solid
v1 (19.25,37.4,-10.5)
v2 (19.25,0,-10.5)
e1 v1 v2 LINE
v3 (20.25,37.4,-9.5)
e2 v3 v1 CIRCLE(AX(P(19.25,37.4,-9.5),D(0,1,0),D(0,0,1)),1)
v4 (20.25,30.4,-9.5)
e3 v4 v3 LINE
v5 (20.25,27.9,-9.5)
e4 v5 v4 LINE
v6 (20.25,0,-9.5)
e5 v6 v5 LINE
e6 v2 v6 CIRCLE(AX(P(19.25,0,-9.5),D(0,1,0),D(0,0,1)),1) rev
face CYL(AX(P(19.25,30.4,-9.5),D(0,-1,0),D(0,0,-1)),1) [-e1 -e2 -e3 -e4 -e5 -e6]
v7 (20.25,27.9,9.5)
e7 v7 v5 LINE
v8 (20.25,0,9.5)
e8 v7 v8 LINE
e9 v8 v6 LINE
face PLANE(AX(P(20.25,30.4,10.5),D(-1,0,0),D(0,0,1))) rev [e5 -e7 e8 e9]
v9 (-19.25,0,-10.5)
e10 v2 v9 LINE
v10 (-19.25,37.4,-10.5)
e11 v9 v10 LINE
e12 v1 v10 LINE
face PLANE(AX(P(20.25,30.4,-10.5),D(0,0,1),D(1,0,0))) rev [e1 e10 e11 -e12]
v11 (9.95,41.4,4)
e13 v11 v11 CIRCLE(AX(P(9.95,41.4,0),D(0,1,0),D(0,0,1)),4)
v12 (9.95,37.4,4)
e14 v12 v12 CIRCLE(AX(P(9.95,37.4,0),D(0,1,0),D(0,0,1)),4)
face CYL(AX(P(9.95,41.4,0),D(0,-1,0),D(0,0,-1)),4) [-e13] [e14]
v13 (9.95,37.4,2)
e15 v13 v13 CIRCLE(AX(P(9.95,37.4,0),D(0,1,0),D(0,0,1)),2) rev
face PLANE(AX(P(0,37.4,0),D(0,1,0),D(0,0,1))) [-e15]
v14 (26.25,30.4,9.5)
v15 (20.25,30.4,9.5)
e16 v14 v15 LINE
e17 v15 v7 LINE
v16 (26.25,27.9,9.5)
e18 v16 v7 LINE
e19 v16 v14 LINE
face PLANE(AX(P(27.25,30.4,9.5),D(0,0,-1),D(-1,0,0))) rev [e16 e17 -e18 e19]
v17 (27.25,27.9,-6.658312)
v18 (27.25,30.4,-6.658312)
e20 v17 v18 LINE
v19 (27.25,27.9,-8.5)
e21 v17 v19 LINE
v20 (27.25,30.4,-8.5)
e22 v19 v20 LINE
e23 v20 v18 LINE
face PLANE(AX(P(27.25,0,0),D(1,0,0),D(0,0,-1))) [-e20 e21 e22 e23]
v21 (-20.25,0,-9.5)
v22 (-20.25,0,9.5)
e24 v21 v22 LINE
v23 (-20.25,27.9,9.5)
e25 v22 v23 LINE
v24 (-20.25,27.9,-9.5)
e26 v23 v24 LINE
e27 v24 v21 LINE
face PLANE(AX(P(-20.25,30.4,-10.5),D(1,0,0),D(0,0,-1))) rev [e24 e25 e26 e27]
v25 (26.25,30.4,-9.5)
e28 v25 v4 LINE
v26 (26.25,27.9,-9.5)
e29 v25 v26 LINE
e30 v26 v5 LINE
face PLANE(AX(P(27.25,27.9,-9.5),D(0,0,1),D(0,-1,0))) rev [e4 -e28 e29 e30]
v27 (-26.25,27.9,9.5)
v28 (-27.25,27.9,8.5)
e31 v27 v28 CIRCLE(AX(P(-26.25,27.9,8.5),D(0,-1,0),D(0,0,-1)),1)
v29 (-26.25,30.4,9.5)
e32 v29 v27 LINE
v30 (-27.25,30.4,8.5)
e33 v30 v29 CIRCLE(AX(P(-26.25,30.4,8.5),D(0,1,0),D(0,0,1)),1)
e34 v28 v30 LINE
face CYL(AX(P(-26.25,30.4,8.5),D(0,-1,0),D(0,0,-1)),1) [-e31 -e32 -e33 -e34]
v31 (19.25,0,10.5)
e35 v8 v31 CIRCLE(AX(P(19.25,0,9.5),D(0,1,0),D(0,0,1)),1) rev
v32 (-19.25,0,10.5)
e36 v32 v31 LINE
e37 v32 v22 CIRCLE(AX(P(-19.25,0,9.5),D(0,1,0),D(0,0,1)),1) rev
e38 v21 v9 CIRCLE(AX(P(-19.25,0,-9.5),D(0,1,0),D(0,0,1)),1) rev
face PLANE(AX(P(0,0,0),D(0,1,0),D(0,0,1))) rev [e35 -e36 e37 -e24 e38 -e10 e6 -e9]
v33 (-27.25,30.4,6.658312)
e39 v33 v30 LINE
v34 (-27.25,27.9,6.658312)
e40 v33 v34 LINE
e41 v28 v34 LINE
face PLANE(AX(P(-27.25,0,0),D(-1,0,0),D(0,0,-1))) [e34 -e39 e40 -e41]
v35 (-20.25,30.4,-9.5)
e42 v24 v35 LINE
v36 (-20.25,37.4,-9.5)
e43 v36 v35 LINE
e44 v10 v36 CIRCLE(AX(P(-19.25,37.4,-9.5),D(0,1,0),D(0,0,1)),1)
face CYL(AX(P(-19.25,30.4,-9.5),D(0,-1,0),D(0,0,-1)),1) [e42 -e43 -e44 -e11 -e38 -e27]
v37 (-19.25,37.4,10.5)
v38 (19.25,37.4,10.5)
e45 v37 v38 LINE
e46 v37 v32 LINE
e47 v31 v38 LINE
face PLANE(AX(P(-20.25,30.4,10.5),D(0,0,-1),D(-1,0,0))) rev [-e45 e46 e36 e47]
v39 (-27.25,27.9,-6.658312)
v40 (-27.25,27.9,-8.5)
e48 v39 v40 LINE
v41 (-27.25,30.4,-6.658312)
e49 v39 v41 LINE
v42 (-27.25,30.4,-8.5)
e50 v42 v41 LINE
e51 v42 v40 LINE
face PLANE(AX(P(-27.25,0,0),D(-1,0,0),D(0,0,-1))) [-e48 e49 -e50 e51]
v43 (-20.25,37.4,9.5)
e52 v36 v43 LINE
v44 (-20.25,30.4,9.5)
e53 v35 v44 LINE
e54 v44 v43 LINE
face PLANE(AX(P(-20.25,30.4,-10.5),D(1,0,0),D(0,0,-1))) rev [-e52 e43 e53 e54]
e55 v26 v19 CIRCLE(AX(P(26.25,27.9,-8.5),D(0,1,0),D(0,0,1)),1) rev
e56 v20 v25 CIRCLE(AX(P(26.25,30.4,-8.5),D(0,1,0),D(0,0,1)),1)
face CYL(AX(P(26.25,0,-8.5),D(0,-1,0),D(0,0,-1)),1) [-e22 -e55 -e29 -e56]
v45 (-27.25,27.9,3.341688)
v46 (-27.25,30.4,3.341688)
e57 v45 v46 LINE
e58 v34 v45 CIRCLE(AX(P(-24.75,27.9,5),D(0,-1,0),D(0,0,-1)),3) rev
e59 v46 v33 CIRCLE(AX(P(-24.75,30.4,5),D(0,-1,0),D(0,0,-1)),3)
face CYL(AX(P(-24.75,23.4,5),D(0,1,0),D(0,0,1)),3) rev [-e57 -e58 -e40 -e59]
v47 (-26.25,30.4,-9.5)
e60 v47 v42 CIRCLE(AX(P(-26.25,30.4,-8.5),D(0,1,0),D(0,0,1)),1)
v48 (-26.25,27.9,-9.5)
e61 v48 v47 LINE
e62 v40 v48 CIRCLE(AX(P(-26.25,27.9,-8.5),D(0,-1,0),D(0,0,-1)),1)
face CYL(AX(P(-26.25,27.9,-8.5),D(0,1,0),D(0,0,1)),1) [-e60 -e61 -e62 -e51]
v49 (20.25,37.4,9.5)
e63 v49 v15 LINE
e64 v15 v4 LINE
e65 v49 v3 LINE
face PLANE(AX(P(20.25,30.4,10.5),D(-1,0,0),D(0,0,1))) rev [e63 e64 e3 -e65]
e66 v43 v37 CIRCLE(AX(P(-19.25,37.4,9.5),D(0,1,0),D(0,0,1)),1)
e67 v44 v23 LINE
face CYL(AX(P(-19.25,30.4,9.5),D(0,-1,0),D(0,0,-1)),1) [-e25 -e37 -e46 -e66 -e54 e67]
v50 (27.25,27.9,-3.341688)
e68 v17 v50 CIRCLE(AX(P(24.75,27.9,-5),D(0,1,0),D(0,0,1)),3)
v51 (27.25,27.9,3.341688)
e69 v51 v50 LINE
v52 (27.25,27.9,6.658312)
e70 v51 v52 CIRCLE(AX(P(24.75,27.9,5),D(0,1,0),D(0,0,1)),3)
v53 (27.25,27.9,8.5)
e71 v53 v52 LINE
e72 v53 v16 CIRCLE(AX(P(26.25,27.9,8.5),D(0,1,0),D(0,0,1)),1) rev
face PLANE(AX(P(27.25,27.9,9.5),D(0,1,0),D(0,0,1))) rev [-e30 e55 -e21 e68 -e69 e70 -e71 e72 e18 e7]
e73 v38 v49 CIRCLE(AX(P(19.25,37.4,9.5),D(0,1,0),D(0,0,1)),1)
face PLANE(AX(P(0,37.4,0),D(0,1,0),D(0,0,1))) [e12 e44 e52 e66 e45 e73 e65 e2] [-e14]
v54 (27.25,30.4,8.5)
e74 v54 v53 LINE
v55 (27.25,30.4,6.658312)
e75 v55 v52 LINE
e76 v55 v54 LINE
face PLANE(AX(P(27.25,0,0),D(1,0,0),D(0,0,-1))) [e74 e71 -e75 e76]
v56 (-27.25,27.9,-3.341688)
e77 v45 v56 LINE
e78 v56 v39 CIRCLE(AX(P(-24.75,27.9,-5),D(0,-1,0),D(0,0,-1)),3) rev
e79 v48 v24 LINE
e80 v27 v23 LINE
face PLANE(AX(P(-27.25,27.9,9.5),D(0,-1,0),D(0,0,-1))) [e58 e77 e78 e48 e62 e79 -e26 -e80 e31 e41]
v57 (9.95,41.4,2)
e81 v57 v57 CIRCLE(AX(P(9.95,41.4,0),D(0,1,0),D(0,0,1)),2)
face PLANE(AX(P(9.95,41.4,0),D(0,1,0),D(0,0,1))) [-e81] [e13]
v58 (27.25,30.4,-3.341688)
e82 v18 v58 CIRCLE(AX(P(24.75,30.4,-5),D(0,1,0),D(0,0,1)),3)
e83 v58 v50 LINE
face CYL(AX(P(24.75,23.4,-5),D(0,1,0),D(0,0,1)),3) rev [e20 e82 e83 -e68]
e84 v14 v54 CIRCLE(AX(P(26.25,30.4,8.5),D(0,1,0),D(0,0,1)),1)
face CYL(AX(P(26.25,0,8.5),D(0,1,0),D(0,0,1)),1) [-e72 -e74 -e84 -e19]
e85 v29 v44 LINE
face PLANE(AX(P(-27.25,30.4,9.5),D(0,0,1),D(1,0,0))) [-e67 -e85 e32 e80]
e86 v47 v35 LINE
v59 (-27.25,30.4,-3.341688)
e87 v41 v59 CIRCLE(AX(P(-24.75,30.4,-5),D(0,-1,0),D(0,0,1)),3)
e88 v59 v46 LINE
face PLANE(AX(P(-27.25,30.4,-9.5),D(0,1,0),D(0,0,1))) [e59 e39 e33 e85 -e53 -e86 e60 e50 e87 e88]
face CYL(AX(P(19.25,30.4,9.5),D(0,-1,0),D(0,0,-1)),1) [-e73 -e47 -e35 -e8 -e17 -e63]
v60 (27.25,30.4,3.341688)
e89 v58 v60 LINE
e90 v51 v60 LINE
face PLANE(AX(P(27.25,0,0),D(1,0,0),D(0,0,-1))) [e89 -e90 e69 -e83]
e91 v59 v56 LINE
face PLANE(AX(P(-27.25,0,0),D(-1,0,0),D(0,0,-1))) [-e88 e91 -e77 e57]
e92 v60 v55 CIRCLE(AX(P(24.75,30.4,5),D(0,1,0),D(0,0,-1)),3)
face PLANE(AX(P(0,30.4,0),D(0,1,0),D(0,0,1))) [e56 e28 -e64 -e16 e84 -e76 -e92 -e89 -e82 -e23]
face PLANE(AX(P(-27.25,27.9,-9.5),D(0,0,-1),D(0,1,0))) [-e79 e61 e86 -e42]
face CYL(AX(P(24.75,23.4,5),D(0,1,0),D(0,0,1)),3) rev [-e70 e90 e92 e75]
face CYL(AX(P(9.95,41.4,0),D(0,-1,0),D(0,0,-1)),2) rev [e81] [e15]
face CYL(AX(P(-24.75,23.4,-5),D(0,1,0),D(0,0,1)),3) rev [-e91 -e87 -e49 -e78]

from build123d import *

# Parameters (mm, degrees)
SKETCH_1_W          = 40.5
SKETCH_1_H          = 21
EXTRUDE_1_DEPTH     = 30.4
SKETCH_2_W          = 19
SKETCH_2_H          = 2.5
EXTRUDE_2_DEPTH     = 7
SKETCH_3_W          = 40.5
SKETCH_3_H          = 21
EXTRUDE_3_DEPTH     = 7
SKETCH_4_R          = 3
CUT_EXTRUDE_1_DEPTH = 7
SKETCH_5_R          = 4
SKETCH_5_R_2        = 2
EXTRUDE_4_DEPTH     = 4
FILLET_1_R          = 1
FILLET_2_R          = 1
FILLET_3_R          = 1
FILLET_4_R          = 1
FILLET_5_R          = 1
FILLET_6_R          = 1
FILLET_7_R          = 1
FILLET_8_R          = 1


with BuildPart() as part:
    # 草图1 → 凸台-拉伸1 (new body)
    with BuildSketch(Plane(origin=(0, 0, 0), x_dir=(1, 0, 0), z_dir=(0, 1, 0))):
        Rectangle(SKETCH_1_W, SKETCH_1_H)
    extrude(amount=EXTRUDE_1_DEPTH)

    # 草图2 → 凸台-拉伸2 (add)
    with BuildSketch(Plane(origin=(20.25, 0, 0), x_dir=(0, 0, -1), z_dir=(1, 0, 0))):
        with Locations((0, 29.15)):
            Rectangle(SKETCH_2_W, SKETCH_2_H)
    extrude_2 = extrude(amount=EXTRUDE_2_DEPTH)

    # 草图3 → 凸台-拉伸3 (add)
    with BuildSketch(Plane(origin=(0, 30.4, 0), x_dir=(1, 0, 0), z_dir=(0, 1, 0))):
        Rectangle(SKETCH_3_W, SKETCH_3_H)
    extrude(amount=EXTRUDE_3_DEPTH)

    # 草图4 → 切除-拉伸1 (cut)
    with BuildSketch(Plane(origin=(0, 30.4, 0), x_dir=(1, 0, 0), z_dir=(0, 1, 0))):
        with Locations((24.75, 5)):
            Circle(SKETCH_4_R)
        with Locations((24.75, -5)):
            Circle(SKETCH_4_R)
    cut_extrude_1 = extrude(amount=-CUT_EXTRUDE_1_DEPTH, mode=Mode.SUBTRACT)

    # 草图5 → 凸台-拉伸4 (add)
    with BuildSketch(Plane(origin=(0, 37.4, 0), x_dir=(1, 0, 0), z_dir=(0, 1, 0))):
        with Locations(Location((9.95, 0, 0), (0, 0, 270))):
            Circle(SKETCH_5_R)
        with Locations(Location((9.95, 0, 0), (0, 0, 270))):
            Circle(SKETCH_5_R_2, mode=Mode.SUBTRACT)
    extrude(amount=EXTRUDE_4_DEPTH)

    # 镜向2: 凸台-拉伸2, 切除-拉伸1 across plane
    add(extrude_2.mirror(Plane(origin=(0, 0, 0), x_dir=(0, 0, 1), z_dir=(1, 0, 0))))
    add(cut_extrude_1.mirror(Plane(origin=(0, 0, 0), x_dir=(0, 0, 1), z_dir=(1, 0, 0))), mode=Mode.SUBTRACT)

    # 圆角1
    fillet_1_edges = [part.edges().sort_by_distance(p)[0] for p in [
        (20.25, 18.7, -10.5),
    ]]
    fillet(fillet_1_edges, radius=FILLET_1_R - 0.0001)  # a hair under: the kernel refuses the full size

    # 圆角2
    fillet_2_edges = [part.edges().sort_by_distance(p)[0] for p in [
        (20.25, 18.7, 10.5),
    ]]
    fillet(fillet_2_edges, radius=FILLET_2_R - 0.0001)  # a hair under: the kernel refuses the full size

    # 圆角3
    fillet_3_edges = [part.edges().sort_by_distance(p)[0] for p in [
        (-20.25, 18.7, 10.5),
    ]]
    fillet(fillet_3_edges, radius=FILLET_3_R - 0.0001)  # a hair under: the kernel refuses the full size

    # 圆角4
    fillet_4_edges = [part.edges().sort_by_distance(p)[0] for p in [
        (-20.25, 18.7, -10.5),
    ]]
    fillet(fillet_4_edges, radius=FILLET_4_R - 0.0001)  # a hair under: the kernel refuses the full size

    # 圆角5
    fillet_5_edges = [part.edges().sort_by_distance(p)[0] for p in [
        (-27.25, 29.15, -9.5),
    ]]
    fillet(fillet_5_edges, radius=FILLET_5_R)

    # 圆角6
    fillet_6_edges = [part.edges().sort_by_distance(p)[0] for p in [
        (-27.25, 29.15, 9.5),
    ]]
    fillet(fillet_6_edges, radius=FILLET_6_R)

    # 圆角7
    fillet_7_edges = [part.edges().sort_by_distance(p)[0] for p in [
        (27.25, 29.15, 9.5),
    ]]
    fillet(fillet_7_edges, radius=FILLET_7_R)

    # 圆角8
    fillet_8_edges = [part.edges().sort_by_distance(p)[0] for p in [
        (27.25, 29.15, -9.5),
    ]]
    fillet(fillet_8_edges, radius=FILLET_8_R)


solid = part.part
